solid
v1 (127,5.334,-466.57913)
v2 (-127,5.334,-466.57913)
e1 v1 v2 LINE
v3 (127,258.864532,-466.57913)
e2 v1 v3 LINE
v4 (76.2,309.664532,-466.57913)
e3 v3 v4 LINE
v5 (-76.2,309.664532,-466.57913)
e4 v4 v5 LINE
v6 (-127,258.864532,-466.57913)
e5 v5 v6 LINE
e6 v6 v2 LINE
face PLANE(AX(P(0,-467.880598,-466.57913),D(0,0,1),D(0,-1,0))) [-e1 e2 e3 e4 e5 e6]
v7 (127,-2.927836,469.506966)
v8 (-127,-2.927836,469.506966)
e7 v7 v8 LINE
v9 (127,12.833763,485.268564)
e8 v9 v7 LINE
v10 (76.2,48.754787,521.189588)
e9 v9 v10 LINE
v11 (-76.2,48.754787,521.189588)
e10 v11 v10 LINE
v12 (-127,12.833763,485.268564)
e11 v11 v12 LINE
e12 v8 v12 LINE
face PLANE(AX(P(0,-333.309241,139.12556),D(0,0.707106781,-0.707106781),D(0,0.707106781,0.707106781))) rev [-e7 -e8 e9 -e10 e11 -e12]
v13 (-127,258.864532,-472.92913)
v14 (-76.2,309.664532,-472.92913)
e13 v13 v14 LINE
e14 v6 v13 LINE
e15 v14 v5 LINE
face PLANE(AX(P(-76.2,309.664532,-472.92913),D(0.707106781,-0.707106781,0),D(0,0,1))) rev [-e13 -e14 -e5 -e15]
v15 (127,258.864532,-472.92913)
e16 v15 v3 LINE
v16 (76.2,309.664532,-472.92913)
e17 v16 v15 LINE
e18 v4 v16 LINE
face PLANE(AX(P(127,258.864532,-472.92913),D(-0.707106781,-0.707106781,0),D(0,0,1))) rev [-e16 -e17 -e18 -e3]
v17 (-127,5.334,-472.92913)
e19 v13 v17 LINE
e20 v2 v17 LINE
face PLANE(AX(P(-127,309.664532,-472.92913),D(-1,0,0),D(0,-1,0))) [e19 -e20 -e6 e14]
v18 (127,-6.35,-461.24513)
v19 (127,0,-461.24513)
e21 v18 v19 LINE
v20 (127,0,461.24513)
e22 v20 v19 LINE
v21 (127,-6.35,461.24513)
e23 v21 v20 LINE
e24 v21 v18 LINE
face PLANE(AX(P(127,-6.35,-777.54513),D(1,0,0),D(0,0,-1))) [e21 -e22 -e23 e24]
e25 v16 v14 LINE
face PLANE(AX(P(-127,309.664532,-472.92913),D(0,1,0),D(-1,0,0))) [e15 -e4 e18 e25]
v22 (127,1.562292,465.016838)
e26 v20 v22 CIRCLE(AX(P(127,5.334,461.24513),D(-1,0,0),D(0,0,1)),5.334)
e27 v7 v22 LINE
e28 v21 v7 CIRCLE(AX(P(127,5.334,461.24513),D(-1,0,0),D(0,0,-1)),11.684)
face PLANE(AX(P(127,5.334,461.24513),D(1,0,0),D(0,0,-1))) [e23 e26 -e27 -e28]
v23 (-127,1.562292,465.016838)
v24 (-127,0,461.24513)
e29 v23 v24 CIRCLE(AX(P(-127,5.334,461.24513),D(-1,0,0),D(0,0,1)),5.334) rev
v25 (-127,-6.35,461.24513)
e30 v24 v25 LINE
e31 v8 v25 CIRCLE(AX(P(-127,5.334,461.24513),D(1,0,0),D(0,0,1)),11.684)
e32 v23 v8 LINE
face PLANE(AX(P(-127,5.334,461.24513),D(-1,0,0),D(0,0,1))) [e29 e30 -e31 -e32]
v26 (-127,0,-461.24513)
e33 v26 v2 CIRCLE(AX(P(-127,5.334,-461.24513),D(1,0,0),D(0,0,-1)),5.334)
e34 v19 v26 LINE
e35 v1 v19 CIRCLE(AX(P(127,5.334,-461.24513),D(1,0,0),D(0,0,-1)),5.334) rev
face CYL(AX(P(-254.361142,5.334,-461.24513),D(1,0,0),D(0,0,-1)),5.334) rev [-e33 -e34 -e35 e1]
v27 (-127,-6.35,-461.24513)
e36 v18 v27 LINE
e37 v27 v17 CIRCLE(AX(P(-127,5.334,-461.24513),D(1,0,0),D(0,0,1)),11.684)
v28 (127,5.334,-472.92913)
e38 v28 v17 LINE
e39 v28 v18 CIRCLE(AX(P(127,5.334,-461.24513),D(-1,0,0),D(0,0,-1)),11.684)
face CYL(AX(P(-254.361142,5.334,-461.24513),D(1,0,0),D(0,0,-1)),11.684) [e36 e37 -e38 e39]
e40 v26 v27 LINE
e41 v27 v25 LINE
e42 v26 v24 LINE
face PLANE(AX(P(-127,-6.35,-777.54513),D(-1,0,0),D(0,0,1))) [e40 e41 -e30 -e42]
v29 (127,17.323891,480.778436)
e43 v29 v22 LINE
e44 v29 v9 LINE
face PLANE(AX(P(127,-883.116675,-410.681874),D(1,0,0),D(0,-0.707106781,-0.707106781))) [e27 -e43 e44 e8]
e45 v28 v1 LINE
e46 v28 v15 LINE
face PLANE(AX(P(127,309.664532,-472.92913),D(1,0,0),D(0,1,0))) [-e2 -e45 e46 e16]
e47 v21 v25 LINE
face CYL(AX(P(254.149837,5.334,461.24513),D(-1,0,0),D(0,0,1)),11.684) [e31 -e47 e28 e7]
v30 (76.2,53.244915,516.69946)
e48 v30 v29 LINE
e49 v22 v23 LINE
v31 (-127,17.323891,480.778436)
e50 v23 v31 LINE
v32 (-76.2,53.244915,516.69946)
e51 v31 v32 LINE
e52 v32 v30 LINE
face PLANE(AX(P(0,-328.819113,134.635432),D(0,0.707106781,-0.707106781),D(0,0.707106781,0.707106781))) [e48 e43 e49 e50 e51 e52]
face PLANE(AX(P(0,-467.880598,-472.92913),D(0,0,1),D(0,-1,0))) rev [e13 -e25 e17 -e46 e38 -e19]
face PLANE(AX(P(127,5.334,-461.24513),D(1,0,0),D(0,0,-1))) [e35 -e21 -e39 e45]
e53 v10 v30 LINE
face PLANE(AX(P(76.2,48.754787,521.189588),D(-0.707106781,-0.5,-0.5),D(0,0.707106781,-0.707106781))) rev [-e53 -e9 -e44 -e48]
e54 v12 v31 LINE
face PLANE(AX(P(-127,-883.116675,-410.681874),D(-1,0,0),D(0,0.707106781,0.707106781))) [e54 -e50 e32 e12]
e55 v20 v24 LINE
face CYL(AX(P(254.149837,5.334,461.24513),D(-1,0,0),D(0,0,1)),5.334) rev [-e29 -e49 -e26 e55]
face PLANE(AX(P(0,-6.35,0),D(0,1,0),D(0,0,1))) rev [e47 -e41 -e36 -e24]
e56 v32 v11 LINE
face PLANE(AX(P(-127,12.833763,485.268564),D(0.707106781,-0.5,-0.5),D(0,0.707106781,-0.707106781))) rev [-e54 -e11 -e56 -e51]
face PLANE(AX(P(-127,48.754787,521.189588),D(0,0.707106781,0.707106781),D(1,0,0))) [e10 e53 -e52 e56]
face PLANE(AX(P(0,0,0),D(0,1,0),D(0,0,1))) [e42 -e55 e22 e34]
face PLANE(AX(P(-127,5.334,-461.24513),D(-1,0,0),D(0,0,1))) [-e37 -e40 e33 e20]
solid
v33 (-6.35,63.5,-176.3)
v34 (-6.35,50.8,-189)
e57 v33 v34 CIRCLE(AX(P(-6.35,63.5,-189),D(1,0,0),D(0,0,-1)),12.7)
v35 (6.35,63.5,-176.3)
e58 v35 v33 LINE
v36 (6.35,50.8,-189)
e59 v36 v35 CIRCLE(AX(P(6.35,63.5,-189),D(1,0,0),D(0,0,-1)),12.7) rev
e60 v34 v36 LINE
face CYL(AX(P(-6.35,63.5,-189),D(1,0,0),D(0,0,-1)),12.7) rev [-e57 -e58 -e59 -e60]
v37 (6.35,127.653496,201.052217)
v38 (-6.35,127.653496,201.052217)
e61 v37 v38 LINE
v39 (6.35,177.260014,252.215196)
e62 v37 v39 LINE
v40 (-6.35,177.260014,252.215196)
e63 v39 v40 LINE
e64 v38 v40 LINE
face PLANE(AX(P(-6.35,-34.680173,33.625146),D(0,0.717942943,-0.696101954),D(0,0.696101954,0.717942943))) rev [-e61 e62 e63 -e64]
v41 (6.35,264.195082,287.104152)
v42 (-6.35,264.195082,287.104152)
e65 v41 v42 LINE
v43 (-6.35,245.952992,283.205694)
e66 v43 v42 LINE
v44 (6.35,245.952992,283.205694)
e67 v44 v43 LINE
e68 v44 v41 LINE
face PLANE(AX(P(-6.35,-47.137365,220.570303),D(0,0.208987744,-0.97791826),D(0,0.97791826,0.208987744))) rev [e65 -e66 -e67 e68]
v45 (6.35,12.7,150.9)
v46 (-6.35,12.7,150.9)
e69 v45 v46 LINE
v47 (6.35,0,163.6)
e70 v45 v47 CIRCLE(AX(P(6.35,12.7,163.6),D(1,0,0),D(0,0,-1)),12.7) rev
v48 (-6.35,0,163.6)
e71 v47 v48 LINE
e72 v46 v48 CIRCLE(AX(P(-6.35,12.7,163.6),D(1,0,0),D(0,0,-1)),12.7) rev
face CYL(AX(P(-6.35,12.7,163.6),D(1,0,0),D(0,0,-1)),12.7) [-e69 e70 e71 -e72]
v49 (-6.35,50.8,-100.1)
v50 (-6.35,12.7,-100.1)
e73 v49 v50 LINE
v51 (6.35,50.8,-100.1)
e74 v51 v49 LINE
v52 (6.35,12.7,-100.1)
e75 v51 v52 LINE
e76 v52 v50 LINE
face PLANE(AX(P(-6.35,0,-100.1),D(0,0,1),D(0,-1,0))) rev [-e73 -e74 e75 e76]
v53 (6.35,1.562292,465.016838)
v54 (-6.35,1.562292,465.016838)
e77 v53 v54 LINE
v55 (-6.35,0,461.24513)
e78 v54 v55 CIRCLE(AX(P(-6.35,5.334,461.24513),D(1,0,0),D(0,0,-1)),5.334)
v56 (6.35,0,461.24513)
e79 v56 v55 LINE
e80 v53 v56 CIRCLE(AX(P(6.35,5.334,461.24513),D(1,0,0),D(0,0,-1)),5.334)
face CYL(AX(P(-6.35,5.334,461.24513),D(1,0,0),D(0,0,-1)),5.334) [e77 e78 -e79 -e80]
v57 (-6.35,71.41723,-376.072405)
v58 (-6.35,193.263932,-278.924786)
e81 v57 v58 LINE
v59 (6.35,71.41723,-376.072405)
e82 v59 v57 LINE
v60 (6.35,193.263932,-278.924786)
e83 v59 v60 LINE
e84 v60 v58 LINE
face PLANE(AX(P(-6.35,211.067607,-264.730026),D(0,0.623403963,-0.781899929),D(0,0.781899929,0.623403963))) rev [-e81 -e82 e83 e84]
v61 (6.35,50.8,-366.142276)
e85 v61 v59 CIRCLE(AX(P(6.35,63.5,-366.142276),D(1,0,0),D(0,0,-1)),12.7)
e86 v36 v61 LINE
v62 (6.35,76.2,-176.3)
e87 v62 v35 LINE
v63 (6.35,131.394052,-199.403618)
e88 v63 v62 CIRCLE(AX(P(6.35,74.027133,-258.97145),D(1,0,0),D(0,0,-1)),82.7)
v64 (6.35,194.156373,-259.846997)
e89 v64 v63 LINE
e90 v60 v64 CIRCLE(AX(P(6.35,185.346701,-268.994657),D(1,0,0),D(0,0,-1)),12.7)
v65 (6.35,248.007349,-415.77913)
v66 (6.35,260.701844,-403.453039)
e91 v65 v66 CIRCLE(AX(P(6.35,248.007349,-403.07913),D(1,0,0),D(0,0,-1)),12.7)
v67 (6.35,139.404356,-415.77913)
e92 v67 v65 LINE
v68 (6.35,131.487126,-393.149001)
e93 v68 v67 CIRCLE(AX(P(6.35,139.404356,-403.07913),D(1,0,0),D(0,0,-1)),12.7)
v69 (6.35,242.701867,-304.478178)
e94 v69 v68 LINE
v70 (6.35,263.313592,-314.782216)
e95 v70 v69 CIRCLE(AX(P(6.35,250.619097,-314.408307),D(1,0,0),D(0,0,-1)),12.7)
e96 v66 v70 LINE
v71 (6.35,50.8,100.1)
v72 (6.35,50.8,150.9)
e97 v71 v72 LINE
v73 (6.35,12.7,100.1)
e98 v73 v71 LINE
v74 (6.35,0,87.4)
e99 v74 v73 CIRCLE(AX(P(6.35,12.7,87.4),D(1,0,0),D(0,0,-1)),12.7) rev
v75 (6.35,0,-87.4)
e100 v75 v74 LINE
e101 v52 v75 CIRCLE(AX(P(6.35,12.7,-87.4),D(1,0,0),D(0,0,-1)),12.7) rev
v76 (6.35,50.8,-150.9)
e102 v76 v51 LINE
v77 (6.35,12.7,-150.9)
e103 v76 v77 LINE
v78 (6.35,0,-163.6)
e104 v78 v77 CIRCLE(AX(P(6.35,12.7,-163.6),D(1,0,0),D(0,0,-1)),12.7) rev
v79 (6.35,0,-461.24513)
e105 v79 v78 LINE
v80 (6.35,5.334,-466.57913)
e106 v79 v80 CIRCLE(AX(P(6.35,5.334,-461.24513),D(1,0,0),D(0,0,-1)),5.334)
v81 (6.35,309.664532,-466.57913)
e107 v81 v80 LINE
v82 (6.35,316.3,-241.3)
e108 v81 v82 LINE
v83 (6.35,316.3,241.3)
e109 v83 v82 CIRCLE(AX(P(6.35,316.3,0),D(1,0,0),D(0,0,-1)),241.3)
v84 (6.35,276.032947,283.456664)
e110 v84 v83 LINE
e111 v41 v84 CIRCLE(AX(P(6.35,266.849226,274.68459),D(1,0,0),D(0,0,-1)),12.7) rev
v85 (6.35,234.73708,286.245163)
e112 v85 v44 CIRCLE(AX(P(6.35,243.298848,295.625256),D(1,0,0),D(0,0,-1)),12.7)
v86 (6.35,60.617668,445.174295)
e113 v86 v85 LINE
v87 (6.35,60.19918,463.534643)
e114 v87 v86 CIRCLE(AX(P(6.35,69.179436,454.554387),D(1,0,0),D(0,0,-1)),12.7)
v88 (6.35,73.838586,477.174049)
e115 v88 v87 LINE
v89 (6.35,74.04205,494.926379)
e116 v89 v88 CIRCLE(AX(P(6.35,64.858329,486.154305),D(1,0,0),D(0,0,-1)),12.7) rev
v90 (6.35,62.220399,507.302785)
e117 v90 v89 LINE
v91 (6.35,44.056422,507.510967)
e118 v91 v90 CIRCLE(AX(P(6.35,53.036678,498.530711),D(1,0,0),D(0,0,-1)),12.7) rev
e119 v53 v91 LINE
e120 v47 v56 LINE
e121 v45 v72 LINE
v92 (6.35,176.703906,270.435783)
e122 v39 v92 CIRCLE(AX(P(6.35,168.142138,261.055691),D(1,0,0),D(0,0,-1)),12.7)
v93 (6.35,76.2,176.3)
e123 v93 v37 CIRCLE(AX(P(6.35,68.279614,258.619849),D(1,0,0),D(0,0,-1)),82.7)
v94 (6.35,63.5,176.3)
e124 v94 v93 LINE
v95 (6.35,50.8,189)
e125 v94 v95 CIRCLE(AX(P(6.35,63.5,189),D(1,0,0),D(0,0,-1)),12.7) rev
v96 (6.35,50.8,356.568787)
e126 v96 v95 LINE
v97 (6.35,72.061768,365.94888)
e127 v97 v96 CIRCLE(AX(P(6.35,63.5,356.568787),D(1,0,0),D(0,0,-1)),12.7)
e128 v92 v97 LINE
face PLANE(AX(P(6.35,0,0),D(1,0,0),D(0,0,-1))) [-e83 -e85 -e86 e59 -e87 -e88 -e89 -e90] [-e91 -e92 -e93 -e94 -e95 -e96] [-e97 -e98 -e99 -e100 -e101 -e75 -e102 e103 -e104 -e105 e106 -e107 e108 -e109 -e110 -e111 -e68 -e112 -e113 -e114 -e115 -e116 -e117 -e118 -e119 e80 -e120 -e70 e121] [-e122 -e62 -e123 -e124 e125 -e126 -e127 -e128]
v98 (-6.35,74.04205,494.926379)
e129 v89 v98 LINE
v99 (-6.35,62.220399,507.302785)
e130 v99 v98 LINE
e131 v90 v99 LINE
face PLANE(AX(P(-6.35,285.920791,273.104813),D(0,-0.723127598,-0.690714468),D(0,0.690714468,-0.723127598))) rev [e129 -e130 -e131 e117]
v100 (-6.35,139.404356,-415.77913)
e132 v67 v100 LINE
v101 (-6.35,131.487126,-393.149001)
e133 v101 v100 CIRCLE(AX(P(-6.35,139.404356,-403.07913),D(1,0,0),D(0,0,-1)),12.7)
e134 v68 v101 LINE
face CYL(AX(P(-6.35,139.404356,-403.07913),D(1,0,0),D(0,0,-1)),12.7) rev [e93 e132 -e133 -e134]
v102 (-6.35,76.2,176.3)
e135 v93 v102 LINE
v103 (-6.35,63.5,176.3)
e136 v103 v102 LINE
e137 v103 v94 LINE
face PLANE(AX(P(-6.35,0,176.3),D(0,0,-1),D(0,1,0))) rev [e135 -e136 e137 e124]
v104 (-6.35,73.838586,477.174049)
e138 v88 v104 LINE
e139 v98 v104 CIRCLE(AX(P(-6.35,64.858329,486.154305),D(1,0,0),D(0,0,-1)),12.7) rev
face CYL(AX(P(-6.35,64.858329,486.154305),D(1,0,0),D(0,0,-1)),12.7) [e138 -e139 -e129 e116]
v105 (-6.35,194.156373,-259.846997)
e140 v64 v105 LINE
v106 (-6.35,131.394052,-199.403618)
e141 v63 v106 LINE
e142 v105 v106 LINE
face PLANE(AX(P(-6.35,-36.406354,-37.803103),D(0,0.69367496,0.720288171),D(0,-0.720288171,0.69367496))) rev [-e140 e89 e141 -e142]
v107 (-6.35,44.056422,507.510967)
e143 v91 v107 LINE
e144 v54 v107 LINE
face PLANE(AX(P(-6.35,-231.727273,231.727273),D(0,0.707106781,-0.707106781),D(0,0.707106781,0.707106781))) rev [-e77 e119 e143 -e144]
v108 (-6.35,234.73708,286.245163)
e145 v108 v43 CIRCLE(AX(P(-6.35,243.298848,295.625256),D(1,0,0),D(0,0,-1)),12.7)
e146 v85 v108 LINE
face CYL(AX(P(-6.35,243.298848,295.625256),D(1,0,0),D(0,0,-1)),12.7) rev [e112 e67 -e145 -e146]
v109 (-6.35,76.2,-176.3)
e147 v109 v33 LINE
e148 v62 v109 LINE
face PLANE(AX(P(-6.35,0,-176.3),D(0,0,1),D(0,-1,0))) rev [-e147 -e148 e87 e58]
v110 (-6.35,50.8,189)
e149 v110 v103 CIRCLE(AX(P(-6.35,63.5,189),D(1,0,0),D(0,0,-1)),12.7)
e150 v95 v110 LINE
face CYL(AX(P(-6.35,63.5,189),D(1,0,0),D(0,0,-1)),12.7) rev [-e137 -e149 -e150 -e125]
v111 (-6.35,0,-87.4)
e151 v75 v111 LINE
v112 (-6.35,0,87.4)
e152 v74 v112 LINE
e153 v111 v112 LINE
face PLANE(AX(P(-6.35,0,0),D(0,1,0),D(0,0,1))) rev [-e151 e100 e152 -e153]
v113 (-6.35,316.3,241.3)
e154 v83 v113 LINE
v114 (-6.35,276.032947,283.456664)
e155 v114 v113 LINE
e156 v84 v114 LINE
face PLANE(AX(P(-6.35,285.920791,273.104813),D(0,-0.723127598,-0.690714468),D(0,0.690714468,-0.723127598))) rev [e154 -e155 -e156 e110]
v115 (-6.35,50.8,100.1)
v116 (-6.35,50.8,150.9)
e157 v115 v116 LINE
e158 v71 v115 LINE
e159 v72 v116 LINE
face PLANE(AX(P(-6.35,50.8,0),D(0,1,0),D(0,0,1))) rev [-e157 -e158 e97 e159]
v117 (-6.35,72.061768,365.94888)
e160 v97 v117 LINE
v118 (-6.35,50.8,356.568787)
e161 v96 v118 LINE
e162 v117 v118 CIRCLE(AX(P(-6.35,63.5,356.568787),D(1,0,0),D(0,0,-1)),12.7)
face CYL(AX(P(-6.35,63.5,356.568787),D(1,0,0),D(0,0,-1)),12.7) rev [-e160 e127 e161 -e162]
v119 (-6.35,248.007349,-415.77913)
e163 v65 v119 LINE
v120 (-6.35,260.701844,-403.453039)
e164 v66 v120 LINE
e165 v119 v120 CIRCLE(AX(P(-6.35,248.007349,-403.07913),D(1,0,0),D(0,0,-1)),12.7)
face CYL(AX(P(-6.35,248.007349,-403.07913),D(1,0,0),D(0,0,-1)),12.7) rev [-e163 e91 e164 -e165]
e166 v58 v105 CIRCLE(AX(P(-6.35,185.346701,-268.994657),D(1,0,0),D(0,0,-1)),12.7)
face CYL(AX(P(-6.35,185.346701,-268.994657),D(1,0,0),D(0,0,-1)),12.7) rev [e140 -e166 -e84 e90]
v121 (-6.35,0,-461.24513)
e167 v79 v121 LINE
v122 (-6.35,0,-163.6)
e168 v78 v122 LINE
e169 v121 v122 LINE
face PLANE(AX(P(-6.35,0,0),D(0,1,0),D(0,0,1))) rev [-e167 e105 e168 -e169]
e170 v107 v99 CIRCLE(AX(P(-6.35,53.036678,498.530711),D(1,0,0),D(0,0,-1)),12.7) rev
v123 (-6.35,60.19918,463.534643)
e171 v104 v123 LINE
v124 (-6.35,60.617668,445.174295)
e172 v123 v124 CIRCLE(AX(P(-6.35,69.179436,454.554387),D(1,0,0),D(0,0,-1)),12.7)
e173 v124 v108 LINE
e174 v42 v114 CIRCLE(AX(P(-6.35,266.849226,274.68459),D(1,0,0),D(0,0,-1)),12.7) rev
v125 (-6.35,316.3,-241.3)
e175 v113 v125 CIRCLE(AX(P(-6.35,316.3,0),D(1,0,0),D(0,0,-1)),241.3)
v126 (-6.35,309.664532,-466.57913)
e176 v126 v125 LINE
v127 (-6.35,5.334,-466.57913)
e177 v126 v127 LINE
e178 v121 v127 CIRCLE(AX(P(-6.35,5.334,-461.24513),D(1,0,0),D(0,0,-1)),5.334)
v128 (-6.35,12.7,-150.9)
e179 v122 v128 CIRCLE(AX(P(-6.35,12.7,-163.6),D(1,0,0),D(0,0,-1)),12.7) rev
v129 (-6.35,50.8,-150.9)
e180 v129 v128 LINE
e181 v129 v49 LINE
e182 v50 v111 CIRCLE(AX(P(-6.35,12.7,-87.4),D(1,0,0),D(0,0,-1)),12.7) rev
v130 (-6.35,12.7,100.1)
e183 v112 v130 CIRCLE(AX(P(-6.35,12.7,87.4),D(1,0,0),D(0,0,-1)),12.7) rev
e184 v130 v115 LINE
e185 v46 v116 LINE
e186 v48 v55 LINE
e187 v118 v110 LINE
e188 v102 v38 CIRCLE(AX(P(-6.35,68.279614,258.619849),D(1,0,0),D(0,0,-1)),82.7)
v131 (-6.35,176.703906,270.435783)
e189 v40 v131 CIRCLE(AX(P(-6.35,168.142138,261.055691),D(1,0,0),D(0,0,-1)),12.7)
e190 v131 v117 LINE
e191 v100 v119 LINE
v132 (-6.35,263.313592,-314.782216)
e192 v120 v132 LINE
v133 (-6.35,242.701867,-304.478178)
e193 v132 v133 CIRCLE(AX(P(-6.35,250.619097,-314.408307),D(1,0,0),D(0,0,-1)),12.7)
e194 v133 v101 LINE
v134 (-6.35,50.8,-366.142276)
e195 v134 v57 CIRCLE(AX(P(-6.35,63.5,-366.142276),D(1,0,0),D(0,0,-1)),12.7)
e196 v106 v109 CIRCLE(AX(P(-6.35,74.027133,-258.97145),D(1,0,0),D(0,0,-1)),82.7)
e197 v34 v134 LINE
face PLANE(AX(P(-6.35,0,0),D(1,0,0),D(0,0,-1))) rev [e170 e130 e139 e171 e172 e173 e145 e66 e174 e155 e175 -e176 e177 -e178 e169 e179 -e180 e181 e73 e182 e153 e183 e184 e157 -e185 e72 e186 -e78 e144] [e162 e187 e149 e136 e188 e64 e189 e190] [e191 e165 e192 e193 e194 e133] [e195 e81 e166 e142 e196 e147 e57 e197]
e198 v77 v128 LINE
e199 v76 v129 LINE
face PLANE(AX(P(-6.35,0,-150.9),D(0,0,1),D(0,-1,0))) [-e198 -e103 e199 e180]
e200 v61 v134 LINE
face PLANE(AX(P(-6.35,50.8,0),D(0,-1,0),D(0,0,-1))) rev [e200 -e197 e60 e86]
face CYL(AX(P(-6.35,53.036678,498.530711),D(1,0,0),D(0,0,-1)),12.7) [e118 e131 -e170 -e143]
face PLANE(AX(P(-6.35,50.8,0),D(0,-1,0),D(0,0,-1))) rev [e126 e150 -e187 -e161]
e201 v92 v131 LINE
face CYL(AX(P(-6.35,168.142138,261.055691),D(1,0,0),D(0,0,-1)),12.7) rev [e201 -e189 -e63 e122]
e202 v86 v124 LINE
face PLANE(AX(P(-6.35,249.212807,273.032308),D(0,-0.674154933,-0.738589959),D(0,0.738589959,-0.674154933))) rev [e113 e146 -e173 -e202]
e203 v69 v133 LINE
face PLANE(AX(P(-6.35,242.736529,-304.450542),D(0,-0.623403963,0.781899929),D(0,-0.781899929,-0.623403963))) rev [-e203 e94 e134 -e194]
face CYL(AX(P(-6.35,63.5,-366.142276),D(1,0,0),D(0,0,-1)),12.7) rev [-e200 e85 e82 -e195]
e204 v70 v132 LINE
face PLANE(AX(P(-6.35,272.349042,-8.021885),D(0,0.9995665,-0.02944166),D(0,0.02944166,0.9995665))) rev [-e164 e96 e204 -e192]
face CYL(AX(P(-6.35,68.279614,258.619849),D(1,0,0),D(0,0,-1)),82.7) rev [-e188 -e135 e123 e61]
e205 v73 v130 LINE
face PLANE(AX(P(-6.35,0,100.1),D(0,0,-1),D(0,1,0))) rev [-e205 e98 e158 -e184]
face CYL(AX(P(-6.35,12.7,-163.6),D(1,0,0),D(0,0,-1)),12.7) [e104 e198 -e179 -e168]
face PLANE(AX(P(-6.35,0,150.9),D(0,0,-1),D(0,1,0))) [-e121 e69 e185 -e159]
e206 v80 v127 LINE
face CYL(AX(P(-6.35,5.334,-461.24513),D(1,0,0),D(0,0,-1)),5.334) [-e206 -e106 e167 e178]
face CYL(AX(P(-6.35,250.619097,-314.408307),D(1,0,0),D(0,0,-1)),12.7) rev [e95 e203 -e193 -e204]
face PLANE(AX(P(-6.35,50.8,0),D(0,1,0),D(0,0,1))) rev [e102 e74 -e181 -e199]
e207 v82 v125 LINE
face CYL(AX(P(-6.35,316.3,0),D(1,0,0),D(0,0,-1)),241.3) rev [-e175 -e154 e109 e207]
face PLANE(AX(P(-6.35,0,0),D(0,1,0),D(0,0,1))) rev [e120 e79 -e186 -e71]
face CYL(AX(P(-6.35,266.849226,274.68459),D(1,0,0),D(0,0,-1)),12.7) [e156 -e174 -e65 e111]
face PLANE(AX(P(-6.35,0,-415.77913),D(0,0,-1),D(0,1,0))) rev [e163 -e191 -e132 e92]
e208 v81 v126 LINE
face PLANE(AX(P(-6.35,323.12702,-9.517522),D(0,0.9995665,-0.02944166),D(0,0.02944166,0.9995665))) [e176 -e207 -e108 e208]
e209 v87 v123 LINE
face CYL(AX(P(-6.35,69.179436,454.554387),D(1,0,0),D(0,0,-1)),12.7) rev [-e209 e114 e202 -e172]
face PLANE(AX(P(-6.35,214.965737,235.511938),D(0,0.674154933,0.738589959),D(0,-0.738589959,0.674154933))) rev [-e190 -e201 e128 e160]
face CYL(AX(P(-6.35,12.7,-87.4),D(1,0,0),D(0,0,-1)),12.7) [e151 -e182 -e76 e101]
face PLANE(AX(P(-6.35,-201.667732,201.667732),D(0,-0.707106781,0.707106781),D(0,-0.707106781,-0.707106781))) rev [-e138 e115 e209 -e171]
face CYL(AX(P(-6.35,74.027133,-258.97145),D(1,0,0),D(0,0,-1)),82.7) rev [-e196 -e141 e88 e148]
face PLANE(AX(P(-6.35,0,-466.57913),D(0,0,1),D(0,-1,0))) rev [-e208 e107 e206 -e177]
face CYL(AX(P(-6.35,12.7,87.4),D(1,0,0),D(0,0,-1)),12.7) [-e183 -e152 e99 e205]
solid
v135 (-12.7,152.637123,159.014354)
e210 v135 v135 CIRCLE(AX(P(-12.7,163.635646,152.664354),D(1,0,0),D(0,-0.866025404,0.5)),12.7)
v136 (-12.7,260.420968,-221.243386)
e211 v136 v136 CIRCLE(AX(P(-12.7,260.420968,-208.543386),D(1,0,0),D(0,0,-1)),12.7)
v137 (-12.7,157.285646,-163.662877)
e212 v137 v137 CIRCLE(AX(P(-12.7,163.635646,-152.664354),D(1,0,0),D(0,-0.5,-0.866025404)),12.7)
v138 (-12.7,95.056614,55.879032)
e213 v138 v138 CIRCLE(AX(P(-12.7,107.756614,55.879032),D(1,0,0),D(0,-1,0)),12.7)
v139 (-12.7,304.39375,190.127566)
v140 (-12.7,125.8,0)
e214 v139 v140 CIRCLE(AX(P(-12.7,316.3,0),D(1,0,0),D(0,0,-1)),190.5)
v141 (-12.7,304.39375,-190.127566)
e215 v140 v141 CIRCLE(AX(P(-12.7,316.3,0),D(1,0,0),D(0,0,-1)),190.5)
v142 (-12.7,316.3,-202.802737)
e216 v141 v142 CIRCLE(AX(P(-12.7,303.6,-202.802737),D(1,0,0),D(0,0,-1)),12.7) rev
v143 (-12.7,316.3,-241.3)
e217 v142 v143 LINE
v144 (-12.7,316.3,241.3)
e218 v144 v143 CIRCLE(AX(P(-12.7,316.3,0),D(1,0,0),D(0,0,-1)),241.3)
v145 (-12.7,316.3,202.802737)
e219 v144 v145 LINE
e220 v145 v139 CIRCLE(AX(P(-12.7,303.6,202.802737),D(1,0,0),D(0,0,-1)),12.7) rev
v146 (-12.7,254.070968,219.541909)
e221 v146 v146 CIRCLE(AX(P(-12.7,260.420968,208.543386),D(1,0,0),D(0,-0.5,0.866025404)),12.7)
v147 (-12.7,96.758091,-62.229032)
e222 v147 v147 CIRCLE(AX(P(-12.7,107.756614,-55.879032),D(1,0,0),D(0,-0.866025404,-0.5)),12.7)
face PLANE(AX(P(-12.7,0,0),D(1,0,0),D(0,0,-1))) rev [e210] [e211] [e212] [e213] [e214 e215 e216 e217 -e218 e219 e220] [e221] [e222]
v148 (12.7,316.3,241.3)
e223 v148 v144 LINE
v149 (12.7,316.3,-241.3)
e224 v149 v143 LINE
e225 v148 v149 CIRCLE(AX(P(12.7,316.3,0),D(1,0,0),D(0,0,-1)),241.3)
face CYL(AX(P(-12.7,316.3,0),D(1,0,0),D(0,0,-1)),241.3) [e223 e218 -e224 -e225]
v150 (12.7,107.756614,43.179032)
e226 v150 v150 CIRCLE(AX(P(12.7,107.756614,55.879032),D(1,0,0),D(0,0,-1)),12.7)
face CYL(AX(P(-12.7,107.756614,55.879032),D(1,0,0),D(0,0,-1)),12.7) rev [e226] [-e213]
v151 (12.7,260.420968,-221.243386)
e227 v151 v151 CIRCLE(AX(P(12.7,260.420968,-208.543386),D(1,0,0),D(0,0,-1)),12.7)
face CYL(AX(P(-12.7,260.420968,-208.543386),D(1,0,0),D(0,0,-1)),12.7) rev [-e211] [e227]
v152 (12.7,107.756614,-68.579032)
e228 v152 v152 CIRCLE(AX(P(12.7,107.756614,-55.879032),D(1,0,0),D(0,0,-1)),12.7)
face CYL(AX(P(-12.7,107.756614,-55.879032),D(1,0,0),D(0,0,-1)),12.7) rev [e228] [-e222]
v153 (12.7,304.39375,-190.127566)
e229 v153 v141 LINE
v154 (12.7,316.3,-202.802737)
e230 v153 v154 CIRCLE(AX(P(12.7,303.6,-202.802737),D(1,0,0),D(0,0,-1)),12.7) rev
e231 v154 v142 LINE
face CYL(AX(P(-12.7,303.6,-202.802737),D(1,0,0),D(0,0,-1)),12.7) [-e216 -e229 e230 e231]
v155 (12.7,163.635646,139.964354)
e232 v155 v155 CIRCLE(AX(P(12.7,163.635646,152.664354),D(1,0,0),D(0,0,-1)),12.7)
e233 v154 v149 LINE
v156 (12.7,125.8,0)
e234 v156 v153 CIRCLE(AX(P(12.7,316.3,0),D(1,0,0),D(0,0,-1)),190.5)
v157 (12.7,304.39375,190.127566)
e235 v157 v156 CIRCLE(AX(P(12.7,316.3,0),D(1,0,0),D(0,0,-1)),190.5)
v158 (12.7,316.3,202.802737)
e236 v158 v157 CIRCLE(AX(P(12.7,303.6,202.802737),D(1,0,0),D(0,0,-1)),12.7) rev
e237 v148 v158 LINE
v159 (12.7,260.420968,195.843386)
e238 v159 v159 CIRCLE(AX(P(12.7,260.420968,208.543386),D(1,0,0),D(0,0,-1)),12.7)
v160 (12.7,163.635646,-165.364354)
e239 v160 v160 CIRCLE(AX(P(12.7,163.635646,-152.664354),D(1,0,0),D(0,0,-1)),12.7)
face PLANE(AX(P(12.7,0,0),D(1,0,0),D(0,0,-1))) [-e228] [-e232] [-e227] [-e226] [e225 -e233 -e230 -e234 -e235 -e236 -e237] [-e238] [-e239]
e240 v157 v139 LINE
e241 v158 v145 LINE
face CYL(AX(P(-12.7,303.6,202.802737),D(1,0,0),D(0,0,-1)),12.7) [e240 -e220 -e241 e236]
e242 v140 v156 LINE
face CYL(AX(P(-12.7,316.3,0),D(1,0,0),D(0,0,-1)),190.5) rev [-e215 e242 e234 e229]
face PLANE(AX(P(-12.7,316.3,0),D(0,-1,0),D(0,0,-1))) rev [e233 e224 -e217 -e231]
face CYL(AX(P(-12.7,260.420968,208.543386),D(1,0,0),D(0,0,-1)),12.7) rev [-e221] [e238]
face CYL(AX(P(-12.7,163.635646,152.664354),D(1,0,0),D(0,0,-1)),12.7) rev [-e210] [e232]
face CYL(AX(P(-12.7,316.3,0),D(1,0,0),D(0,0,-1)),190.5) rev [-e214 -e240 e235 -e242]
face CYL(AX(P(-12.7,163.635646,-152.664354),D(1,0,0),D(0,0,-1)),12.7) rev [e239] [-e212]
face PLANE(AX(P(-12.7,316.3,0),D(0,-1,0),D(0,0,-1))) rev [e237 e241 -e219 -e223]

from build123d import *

# Parameters (mm, degrees)
FLANGE_PROFILE_DEPTH              = 12.7
F_7_8_1_DIAMETER_HOLE1_D          = 25.4
BOLT_PATTERN_COUNT                = 12
SKETCH5_W                         = 254
SKETCH5_H                         = 1317.865260112
BASE_SKID_DEPTH                   = 6.35
BEND_START                        = -127
BEND_HEEL_DEPTH                   = 254
BEND_HEEL_2_DEPTH                 = 254
BEND_TOE_DEPTH                    = 254
BEND_TOE_2_DEPTH                  = 254
WEBBING_BODY_DEPTH                = 6.35
WEBBING_HOLES_DEPTH               = 623.746559258
WEBBING_HOLES_DEPTH_BACK          = 623.746559258
CROSSBEAM_DEPTH                   = 623.746559258
CROSSBEAM_DEPTH_BACK              = 623.746559258
CROSSMEMBER_W                     = 50.8
CROSSMEMBER_H                     = 50.8
CROSSBEAM_CLEARANCE_DEPTH         = 6.35
CROSSBEAM_FILLET_R                = 12.7
FILLET_CLEARANCE_R                = 82.7
WEBBING_FILLET_R                  = 12.7
SKID_START                        = -376
SKID_EDGES_OUTLINE_W              = 201
SKID_EDGES_OUTLINE_H              = 6.35
SKID_EDGES_DEPTH                  = 37.146275522
SKID_START_2                      = 338.853724478
SKID_EDGES_2_OUTLINE_W            = 200
SKID_EDGES_2_OUTLINE_H            = 6.35
SKID_EDGES_2_DEPTH                = 37.146275522
SKID_START_3                      = -310
SKID_EDGES_3_OUTLINE_W            = 200
SKID_EDGES_3_OUTLINE_H            = 9
SKID_EDGES_3_DEPTH                = 37.152572811
SKID_START_4                      = 272.847427189
SKID_EDGES_4_OUTLINE_W            = 201
SKID_EDGES_4_OUTLINE_H            = 9
SKID_EDGES_4_DEPTH                = 37.152572811
FLANGE_FILLET_R                   = 12.7
CONVERT_START                     = -12.7
CONVERT_FLANGE_TO_SHEET_OUTLINE_R = 12.7
CONVERT_FLANGE_TO_SHEET_DEPTH     = 25.4
CONVERT_START_2                   = -6.35
CONVERT_WEBBING_TO_SHEET_DEPTH    = 12.7
FILLET2_R                         = 12.7


with BuildPart() as part:
    # Sketch1 → Flange Profile (new, symmetric)
    with BuildSketch(Plane(origin=(0, 0, 0), x_dir=(0, 0, -1), z_dir=(1, 0, 0))):
        with BuildLine():
            Line((241.3, 316.3), (190.5, 316.3))
            ThreePointArc((190.5, 316.3), (0, 125.8), (-190.5, 316.3))
            Line((-190.5, 316.3), (-241.3, 316.3))
            ThreePointArc((-241.3, 316.3), (0, 75), (241.3, 316.3))
        make_face()
    extrude(amount=FLANGE_PROFILE_DEPTH, both=True)

    # 7/8 (1) Diameter Hole1 (through all)
    with Locations(Plane(origin=(12.7, 260.420968162, -208.543385896), x_dir=(0, 0, 1), z_dir=(1, 0, 0))):
        with Locations((0, 0)):
            f_7_8_1_diameter_hole1 = Hole(F_7_8_1_DIAMETER_HOLE1_D / 2)

    # Bolt Pattern: 7/8 (1) Diameter Hole1 ×12 about axis
    bolt_pattern_axis = Axis((0, 316.3, 0), (1, 0, 0))
    for i in range(1, BOLT_PATTERN_COUNT):
        add(f_7_8_1_diameter_hole1.rotate(bolt_pattern_axis, i * 360 / BOLT_PATTERN_COUNT), mode=Mode.SUBTRACT)

    # Flange Fillet
    flange_fillet_edges = [part.edges().sort_by_distance(p)[0] for p in [
        (0, 316.3, 190.5),
        (0, 316.3, -190.5),
    ]]
    fillet(flange_fillet_edges, radius=FLANGE_FILLET_R)


with BuildPart() as body_2:
    # Base Skid: sheet metal written as solids
    # Sketch5 → Base Skid (new body)
    with BuildSketch(Plane(origin=(0, 0, 0), x_dir=(1, 0, 0), z_dir=(0, 1, 0))):
        with Locations((0, 118.6125)):
            Rectangle(SKETCH5_W, SKETCH5_H)
    extrude(amount=-BASE_SKID_DEPTH)

    # Bend Heel: read off the stored shape, not the designer's step
    # Bend Heel outline → Bend Heel (cut)
    with BuildSketch(Plane.YZ.offset(BEND_START)):
        with BuildLine():
            Line((0, -777.545130056), (0, -471.640528076))
            ThreePointArc((0, -471.640528076), (-4.636915504, -467.33583609), (-6.35, -461.245130056))
            Line((-6.35, -461.245130056), (-6.35, -777.545130056))
            Line((-6.35, -777.545130056), (0, -777.545130056))
        make_face()
    extrude(amount=BEND_HEEL_DEPTH, mode=Mode.SUBTRACT)

    # Bend Heel 2 outline → Bend Heel 2 (add)
    with BuildSketch(Plane.YZ.offset(BEND_START)):
        with BuildLine():
            Line((5.334, -472.929130056), (309.66453199, -472.929130056))
            Line((309.66453199, -472.929130056), (309.66453199, -466.579130056))
            Line((309.66453199, -466.579130056), (5.334, -466.579130056))
            ThreePointArc((5.334, -466.579130056), (1.56229243, -465.016837626), (0, -461.245130056))
            Line((0, -461.245130056), (0, -471.640528076))
            ThreePointArc((0, -471.640528076), (2.590277571, -472.602411563), (5.334, -472.929130056))
        make_face()
    extrude(amount=BEND_HEEL_2_DEPTH)

    # Bend Toe: read off the stored shape, not the designer's step
    # Bend Toe outline → Bend Toe (cut)
    with BuildSketch(Plane.YZ.offset(BEND_START)):
        with BuildLine():
            Line((-6.35, 540.320130056), (-6.35, 461.245130056))
            ThreePointArc((-6.35, 461.245130056), (-5.460608458, 465.71640328), (-2.927835631, 469.506965687))
            Line((-2.927835631, 469.506965687), (0, 472.434801318))
            Line((0, 472.434801318), (0, 540.320130056))
            Line((0, 540.320130056), (-6.35, 540.320130056))
        make_face()
    extrude(amount=BEND_TOE_DEPTH, mode=Mode.SUBTRACT)

    # Bend Toe 2 outline → Bend Toe 2 (add)
    with BuildSketch(Plane.YZ.offset(BEND_START)):
        with BuildLine():
            Line((48.754787092, 521.189588411), (0, 472.434801318))
            Line((0, 472.434801318), (0, 461.245130056))
            ThreePointArc((0, 461.245130056), (0.406026574, 463.286363484), (1.562292429, 465.016837626))
            Line((1.562292429, 465.016837626), (53.244915153, 516.69946035))
            Line((53.244915153, 516.69946035), (48.754787092, 521.189588411))
        make_face()
    extrude(amount=BEND_TOE_2_DEPTH)

    # Skid Edges: read off the stored shape, not the designer's step
    # Skid Edges outline → Skid Edges (cut)
    with BuildSketch(Plane(origin=(0, 0, 0), x_dir=(0.7071067811865501, 0.4999999999999991, 0.499999999999997), z_dir=(0.7071067811865449, -0.5000000000000029, -0.5000000000000008)).offset(SKID_START)):
        with Locations((258.5, 330.886851681)):
            Rectangle(SKID_EDGES_OUTLINE_W, SKID_EDGES_OUTLINE_H)
    extrude(amount=SKID_EDGES_DEPTH, mode=Mode.SUBTRACT)

    # Skid Edges 2 outline → Skid Edges 2 (cut)
    with BuildSketch(Plane(origin=(0, 0, 0), x_dir=(0.7071067811865501, -0.4999999999999991, -0.499999999999997), z_dir=(0.7071067811865449, 0.5000000000000029, 0.5000000000000008)).offset(SKID_START_2)):
        with Locations((-258, -330.886851681)):
            Rectangle(SKID_EDGES_2_OUTLINE_W, SKID_EDGES_2_OUTLINE_H)
    extrude(amount=SKID_EDGES_2_DEPTH, mode=Mode.SUBTRACT)

    # Skid Edges 3 outline → Skid Edges 3 (cut)
    with BuildSketch(Plane(origin=(0, 0, 0), x_dir=(0.7071067811865474, 0.7071067811865477, 0), z_dir=(0.7071067811865476, -0.7071067811865476, 0)).offset(SKID_START_3)):
        with Locations((192, -469.5)):
            Rectangle(SKID_EDGES_3_OUTLINE_W, SKID_EDGES_3_OUTLINE_H)
    extrude(amount=SKID_EDGES_3_DEPTH, mode=Mode.SUBTRACT)

    # Skid Edges 4 outline → Skid Edges 4 (cut)
    with BuildSketch(Plane(origin=(0, 0, 0), x_dir=(0.707106781186548, -0.707106781186547, 0), z_dir=(0.707106781186547, 0.707106781186548, 0)).offset(SKID_START_4)):
        with Locations((-192.5, 469.5)):
            Rectangle(SKID_EDGES_4_OUTLINE_W, SKID_EDGES_4_OUTLINE_H)
    extrude(amount=SKID_EDGES_4_DEPTH, mode=Mode.SUBTRACT)


with BuildPart() as body_3:
    # Sketch12 → Webbing Body (new, symmetric)
    with BuildSketch(Plane(origin=(0, 0, 0), x_dir=(0, 0, -1), z_dir=(1, 0, 0))):
        with BuildLine():
            Line((-516.69946035, 53.244915153), (-465.016837626, 1.562292429))
            ThreePointArc((-465.016837626, 1.562292429), (-463.286363484, 0.406026574), (-461.245130056, 0))
            Line((-461.245130056, 0), (461.245130056, 0))
            ThreePointArc((461.245130056, 0), (465.016837626, 1.562292429), (466.579130056, 5.334))
            Line((466.579130056, 5.334), (466.579130056, 309.66453199))
            Line((466.579130056, 309.66453199), (241.3, 316.3))
            ThreePointArc((241.3, 316.3), (0, 75), (-241.3, 316.3))
            Line((-241.3, 316.3), (-516.69946035, 53.244915153))
        make_face()
    extrude(amount=WEBBING_BODY_DEPTH, both=True)

    # Sketch13 → Webbing Holes (cut, two sides: drawn at the far end of the back side and taken through both)
    with BuildSketch(Plane(origin=(0, 0, 0), x_dir=(0, 0, -1), z_dir=(1, 0, 0)).offset(-WEBBING_HOLES_DEPTH_BACK)):
        Polygon((415.779130056, 260.338785622), (287.40157486, 264.120073132), (415.779130056, 103.103449381), align=None)
        Polygon((-121.787355666, 50.8), (-385.355758001, 50.8), (-261.612051176, 186.371001392), align=None)
        Polygon((269.894826504, 204.589693285), (392.510394874, 50.8), (121.787355666, 50.8), align=None)
        Polygon((-454.135463722, 50.8), (-485.950787611, 82.615323889), (-288.586784033, 271.132776469), (-281.840137894, 239.563133553), align=None)
    extrude(amount=WEBBING_HOLES_DEPTH + WEBBING_HOLES_DEPTH_BACK, mode=Mode.SUBTRACT)

    # crossmember → Crossbeam (cut, two sides: drawn at the far end of the back side and taken through both)
    with BuildSketch(Plane(origin=(0, 0, 0), x_dir=(0, 0, -1), z_dir=(1, 0, 0)).offset(-CROSSBEAM_DEPTH_BACK)):
        with Locations((125.5, 25.4)):
            Rectangle(CROSSMEMBER_W, CROSSMEMBER_H)
        with Locations((-125.5, 25.4)):
            Rectangle(CROSSMEMBER_W, CROSSMEMBER_H)
    extrude(amount=CROSSBEAM_DEPTH + CROSSBEAM_DEPTH_BACK, mode=Mode.SUBTRACT)

    # crossmember<5> → Crossbeam Clearance (add, symmetric)
    with BuildSketch(Plane(origin=(0, 0, 0), x_dir=(0, 0, -1), z_dir=(1, 0, 0))):
        Polygon((100.1, 50.8), (150.9, 50.8), (150.9, 0), (176.3, 0), (176.3, 76.2), (74.7, 76.2), (74.7, 0), (100.1, 0), align=None)
        Polygon((-100.1, 0), (-74.7, 0), (-74.7, 76.2), (-176.3, 76.2), (-176.3, 0), (-150.9, 0), (-150.9, 50.8), (-100.1, 50.8), align=None)
    extrude(amount=CROSSBEAM_CLEARANCE_DEPTH, both=True)

    # Crossbeam fillet
    crossbeam_fillet_edges = [body_3.edges().sort_by_distance(p)[0] for p in [
        (0, 0, -150.9),
        (0, 0, -100.1),
        (0, 0, 100.1),
        (0, 0, 150.9),
    ]]
    fillet(crossbeam_fillet_edges, radius=CROSSBEAM_FILLET_R)

    # Fillet Clearance
    # the kernel refuses this fillet: 82.7 mm, written as the material it adds along each edge
    with BuildSketch(Plane(origin=(6.35, 76.2, -146.248876324), x_dir=(0, 0, -1), z_dir=(-1, 0, 0))) as fillet_clearance_piece_1:
        with BuildLine():
            CenterArc((112.722573697, 2.172867127), FILLET_CLEARANCE_R, 181.505567644, 42.416154829)
            Line((53.154741922, -55.194052066), (0, 0))
            Line((0, 0), (30.051123676, 0))
        make_face()
    extrude(amount=12.7)
    with BuildSketch(Plane(origin=(-6.35, 76.2, 147.984309509), x_dir=(0, 0.6961019539421004, 0.7179429432190206), z_dir=(1, 0, 0))) as fillet_clearance_piece_2:
        with BuildLine():
            CenterArc((73.916608705, 82.7), FILLET_CLEARANCE_R, 229.610877342, 40.389122658)
            Line((20.32905017, 19.710607478), (0, 0))
            Line((0, 0), (73.916608705, 0))
        make_face()
    extrude(amount=12.7)

    # Webbing Fillet
    webbing_fillet_edges = [body_3.edges().sort_by_distance(p)[0] for p in [
        (0, 53.244915153, 516.69946035),
        (0, 82.615323889, 485.950787611),
        (0, 271.132776469, 288.586784033),
        (0, 239.563133553, 281.840137894),
        (0, 50.8, 454.135463722),
        (0, 204.589693285, -269.894826504),
        (0, 50.8, -392.510394874),
        (0, 186.371001392, 261.612051176),
        (0, 50.8, 385.355758001),
        (0, 260.338785622, -415.779130056),
        (0, 103.103449381, -415.779130056),
        (0, 264.120073132, -287.40157486),
    ]]
    fillet(webbing_fillet_edges, radius=WEBBING_FILLET_R)


with BuildPart() as body_4:
    # Convert Flange to Sheet: read off the stored shape, not the designer's step
    # Convert Flange to Sheet outline → Convert Flange to Sheet (new body)
    with BuildSketch(Plane.YZ.offset(CONVERT_START)):
        with BuildLine():
            ThreePointArc((304.39375, 190.127565626), (312.856636133, 194.107641068), (316.3, 202.802736668))
            Line((316.3, 202.802736668), (316.3, 241.3))
            ThreePointArc((316.3, 241.3), (75, 0), (316.3, -241.3))
            Line((316.3, -241.3), (316.3, -202.802736668))
            ThreePointArc((316.3, -202.802736668), (312.856636133, -194.107641068), (304.39375, -190.127565626))
            ThreePointArc((304.39375, -190.127565626), (125.8, 0), (304.39375, 190.127565626))
        make_face()
        with Locations((163.635645942, -152.664354058)):
            Circle(CONVERT_FLANGE_TO_SHEET_OUTLINE_R, mode=Mode.SUBTRACT)
        with Locations((107.756614104, -55.879031838)):
            Circle(CONVERT_FLANGE_TO_SHEET_OUTLINE_R, mode=Mode.SUBTRACT)
        with Locations((260.420968162, -208.543385896)):
            Circle(CONVERT_FLANGE_TO_SHEET_OUTLINE_R, mode=Mode.SUBTRACT)
        with Locations((107.756614104, 55.879031838)):
            Circle(CONVERT_FLANGE_TO_SHEET_OUTLINE_R, mode=Mode.SUBTRACT)
        with Locations((163.635645942, 152.664354058)):
            Circle(CONVERT_FLANGE_TO_SHEET_OUTLINE_R, mode=Mode.SUBTRACT)
        with Locations((260.420968162, 208.543385896)):
            Circle(CONVERT_FLANGE_TO_SHEET_OUTLINE_R, mode=Mode.SUBTRACT)
    extrude(amount=CONVERT_FLANGE_TO_SHEET_DEPTH)


with BuildPart() as body_5:
    # Convert Webbing to Sheet: read off the stored shape, not the designer's step
    # Convert Webbing to Sheet outline → Convert Webbing to Sheet (new body)
    with BuildSketch(Plane.YZ.offset(CONVERT_START_2)):
        with BuildLine():
            ThreePointArc((12.7, -150.9), (3.719743879, -154.619743879), (0, -163.6))
            Line((0, -163.6), (0, -461.245130056))
            ThreePointArc((0, -461.245130056), (1.56229243, -465.016837626), (5.334, -466.579130056))
            Line((5.334, -466.579130056), (309.66453199, -466.579130056))
            Line((309.66453199, -466.579130056), (316.3, -241.3))
            ThreePointArc((316.3, -241.3), (75, 0), (316.3, 241.3))
            Line((316.3, 241.3), (276.032946761, 283.456663644))
            ThreePointArc((276.032946761, 283.456663644), (270.588863094, 286.821521817), (264.195081913, 287.104151799))
            Line((264.195081913, 287.104151799), (245.952992349, 283.205693921))
            ThreePointArc((245.952992349, 283.205693921), (239.977011634, 283.367384751), (234.737080357, 286.245163347))
            Line((234.737080357, 286.245163347), (60.617668132, 445.174294781))
            ThreePointArc((60.617668132, 445.174294781), (56.482733464, 454.264990592), (60.199179654, 463.534643376))
            Line((60.199179654, 463.534643376), (73.838585609, 477.174049331))
            ThreePointArc((73.838585609, 477.174049331), (77.557495428, 486.008756787), (74.042049988, 494.926379196))
            Line((74.042049988, 494.926379196), (62.220398575, 507.302784775))
            ThreePointArc((62.220398575, 507.302784775), (53.18222674, 511.229876971), (44.056421954, 507.510967151))
            Line((44.056421954, 507.510967151), (1.562292429, 465.016837626))
            ThreePointArc((1.562292429, 465.016837626), (0.406026574, 463.286363484), (0, 461.245130056))
            Line((0, 461.245130056), (0, 163.6))
            ThreePointArc((0, 163.6), (3.719743879, 154.619743879), (12.7, 150.9))
            Line((12.7, 150.9), (50.8, 150.9))
            Line((50.8, 150.9), (50.8, 100.1))
            Line((50.8, 100.1), (12.7, 100.1))
            ThreePointArc((12.7, 100.1), (3.719743879, 96.380256121), (0, 87.4))
            Line((0, 87.4), (0, -87.4))
            ThreePointArc((0, -87.4), (3.719743879, -96.380256121), (12.7, -100.1))
            Line((12.7, -100.1), (50.8, -100.1))
            Line((50.8, -100.1), (50.8, -150.9))
            Line((50.8, -150.9), (12.7, -150.9))
        make_face()
        with BuildLine():
            Line((131.394052066, -199.403618246), (194.156373438, -259.846997017))
            ThreePointArc((194.156373438, -259.846997017), (198.032828609, -269.588102319), (193.263931773, -278.924785894))
            Line((193.263931773, -278.924785894), (71.417230327, -376.07240504))
            ThreePointArc((71.417230327, -376.07240504), (57.98904841, -377.584278062), (50.8, -366.142275939))
            Line((50.8, -366.142275939), (50.8, -176.3))
            Line((50.8, -176.3), (76.2, -176.3))
            ThreePointArc((76.2, -176.3), (105.959731151, -182.685152645), (131.394052066, -199.403618246))
        make_face(mode=Mode.SUBTRACT)
        with BuildLine():
            Line((248.00734903, -415.779130056), (139.404356101, -415.779130056))
            ThreePointArc((139.404356101, -415.779130056), (127.41680757, -407.273016107), (131.487125774, -393.149000955))
            Line((131.487125774, -393.149000955), (242.701867121, -304.478177637))
            ThreePointArc((242.701867121, -304.478177637), (256.297905781, -303.048679283), (263.313592002, -314.782215819))
            Line((263.313592002, -314.782215819), (260.701843584, -403.453039137))
            ThreePointArc((260.701843584, -403.453039137), (256.854420711, -412.190624042), (248.00734903, -415.779130056))
        make_face(mode=Mode.SUBTRACT)
        with BuildLine():
            Line((177.260013842, 252.215196046), (127.653495748, 201.052217116))
            ThreePointArc((127.653495748, 201.052217116), (104.130662555, 184.094736548), (76.2, 176.3))
            Line((76.2, 176.3), (50.8, 176.3))
            Line((50.8, 176.3), (50.8, 356.568787103))
            ThreePointArc((50.8, 356.568787103), (58.373814726, 368.18826319), (72.061767643, 365.948879577))
            Line((72.061767643, 365.948879577), (176.703906107, 270.435783335))
            ThreePointArc((176.703906107, 270.435783335), (180.836227428, 261.443125193), (177.260013842, 252.215196046))
        make_face(mode=Mode.SUBTRACT)
    extrude(amount=CONVERT_WEBBING_TO_SHEET_DEPTH)

    # Fillet2
    fillet2_edges = [body_5.edges().sort_by_distance(p)[0] for p in [
        (0, 50.8, 176.3),
        (0, 50.8, -176.3),
    ]]
    fillet(fillet2_edges, radius=FILLET2_R)


solid = Compound([body_2.part, body_4.part, body_5.part])
